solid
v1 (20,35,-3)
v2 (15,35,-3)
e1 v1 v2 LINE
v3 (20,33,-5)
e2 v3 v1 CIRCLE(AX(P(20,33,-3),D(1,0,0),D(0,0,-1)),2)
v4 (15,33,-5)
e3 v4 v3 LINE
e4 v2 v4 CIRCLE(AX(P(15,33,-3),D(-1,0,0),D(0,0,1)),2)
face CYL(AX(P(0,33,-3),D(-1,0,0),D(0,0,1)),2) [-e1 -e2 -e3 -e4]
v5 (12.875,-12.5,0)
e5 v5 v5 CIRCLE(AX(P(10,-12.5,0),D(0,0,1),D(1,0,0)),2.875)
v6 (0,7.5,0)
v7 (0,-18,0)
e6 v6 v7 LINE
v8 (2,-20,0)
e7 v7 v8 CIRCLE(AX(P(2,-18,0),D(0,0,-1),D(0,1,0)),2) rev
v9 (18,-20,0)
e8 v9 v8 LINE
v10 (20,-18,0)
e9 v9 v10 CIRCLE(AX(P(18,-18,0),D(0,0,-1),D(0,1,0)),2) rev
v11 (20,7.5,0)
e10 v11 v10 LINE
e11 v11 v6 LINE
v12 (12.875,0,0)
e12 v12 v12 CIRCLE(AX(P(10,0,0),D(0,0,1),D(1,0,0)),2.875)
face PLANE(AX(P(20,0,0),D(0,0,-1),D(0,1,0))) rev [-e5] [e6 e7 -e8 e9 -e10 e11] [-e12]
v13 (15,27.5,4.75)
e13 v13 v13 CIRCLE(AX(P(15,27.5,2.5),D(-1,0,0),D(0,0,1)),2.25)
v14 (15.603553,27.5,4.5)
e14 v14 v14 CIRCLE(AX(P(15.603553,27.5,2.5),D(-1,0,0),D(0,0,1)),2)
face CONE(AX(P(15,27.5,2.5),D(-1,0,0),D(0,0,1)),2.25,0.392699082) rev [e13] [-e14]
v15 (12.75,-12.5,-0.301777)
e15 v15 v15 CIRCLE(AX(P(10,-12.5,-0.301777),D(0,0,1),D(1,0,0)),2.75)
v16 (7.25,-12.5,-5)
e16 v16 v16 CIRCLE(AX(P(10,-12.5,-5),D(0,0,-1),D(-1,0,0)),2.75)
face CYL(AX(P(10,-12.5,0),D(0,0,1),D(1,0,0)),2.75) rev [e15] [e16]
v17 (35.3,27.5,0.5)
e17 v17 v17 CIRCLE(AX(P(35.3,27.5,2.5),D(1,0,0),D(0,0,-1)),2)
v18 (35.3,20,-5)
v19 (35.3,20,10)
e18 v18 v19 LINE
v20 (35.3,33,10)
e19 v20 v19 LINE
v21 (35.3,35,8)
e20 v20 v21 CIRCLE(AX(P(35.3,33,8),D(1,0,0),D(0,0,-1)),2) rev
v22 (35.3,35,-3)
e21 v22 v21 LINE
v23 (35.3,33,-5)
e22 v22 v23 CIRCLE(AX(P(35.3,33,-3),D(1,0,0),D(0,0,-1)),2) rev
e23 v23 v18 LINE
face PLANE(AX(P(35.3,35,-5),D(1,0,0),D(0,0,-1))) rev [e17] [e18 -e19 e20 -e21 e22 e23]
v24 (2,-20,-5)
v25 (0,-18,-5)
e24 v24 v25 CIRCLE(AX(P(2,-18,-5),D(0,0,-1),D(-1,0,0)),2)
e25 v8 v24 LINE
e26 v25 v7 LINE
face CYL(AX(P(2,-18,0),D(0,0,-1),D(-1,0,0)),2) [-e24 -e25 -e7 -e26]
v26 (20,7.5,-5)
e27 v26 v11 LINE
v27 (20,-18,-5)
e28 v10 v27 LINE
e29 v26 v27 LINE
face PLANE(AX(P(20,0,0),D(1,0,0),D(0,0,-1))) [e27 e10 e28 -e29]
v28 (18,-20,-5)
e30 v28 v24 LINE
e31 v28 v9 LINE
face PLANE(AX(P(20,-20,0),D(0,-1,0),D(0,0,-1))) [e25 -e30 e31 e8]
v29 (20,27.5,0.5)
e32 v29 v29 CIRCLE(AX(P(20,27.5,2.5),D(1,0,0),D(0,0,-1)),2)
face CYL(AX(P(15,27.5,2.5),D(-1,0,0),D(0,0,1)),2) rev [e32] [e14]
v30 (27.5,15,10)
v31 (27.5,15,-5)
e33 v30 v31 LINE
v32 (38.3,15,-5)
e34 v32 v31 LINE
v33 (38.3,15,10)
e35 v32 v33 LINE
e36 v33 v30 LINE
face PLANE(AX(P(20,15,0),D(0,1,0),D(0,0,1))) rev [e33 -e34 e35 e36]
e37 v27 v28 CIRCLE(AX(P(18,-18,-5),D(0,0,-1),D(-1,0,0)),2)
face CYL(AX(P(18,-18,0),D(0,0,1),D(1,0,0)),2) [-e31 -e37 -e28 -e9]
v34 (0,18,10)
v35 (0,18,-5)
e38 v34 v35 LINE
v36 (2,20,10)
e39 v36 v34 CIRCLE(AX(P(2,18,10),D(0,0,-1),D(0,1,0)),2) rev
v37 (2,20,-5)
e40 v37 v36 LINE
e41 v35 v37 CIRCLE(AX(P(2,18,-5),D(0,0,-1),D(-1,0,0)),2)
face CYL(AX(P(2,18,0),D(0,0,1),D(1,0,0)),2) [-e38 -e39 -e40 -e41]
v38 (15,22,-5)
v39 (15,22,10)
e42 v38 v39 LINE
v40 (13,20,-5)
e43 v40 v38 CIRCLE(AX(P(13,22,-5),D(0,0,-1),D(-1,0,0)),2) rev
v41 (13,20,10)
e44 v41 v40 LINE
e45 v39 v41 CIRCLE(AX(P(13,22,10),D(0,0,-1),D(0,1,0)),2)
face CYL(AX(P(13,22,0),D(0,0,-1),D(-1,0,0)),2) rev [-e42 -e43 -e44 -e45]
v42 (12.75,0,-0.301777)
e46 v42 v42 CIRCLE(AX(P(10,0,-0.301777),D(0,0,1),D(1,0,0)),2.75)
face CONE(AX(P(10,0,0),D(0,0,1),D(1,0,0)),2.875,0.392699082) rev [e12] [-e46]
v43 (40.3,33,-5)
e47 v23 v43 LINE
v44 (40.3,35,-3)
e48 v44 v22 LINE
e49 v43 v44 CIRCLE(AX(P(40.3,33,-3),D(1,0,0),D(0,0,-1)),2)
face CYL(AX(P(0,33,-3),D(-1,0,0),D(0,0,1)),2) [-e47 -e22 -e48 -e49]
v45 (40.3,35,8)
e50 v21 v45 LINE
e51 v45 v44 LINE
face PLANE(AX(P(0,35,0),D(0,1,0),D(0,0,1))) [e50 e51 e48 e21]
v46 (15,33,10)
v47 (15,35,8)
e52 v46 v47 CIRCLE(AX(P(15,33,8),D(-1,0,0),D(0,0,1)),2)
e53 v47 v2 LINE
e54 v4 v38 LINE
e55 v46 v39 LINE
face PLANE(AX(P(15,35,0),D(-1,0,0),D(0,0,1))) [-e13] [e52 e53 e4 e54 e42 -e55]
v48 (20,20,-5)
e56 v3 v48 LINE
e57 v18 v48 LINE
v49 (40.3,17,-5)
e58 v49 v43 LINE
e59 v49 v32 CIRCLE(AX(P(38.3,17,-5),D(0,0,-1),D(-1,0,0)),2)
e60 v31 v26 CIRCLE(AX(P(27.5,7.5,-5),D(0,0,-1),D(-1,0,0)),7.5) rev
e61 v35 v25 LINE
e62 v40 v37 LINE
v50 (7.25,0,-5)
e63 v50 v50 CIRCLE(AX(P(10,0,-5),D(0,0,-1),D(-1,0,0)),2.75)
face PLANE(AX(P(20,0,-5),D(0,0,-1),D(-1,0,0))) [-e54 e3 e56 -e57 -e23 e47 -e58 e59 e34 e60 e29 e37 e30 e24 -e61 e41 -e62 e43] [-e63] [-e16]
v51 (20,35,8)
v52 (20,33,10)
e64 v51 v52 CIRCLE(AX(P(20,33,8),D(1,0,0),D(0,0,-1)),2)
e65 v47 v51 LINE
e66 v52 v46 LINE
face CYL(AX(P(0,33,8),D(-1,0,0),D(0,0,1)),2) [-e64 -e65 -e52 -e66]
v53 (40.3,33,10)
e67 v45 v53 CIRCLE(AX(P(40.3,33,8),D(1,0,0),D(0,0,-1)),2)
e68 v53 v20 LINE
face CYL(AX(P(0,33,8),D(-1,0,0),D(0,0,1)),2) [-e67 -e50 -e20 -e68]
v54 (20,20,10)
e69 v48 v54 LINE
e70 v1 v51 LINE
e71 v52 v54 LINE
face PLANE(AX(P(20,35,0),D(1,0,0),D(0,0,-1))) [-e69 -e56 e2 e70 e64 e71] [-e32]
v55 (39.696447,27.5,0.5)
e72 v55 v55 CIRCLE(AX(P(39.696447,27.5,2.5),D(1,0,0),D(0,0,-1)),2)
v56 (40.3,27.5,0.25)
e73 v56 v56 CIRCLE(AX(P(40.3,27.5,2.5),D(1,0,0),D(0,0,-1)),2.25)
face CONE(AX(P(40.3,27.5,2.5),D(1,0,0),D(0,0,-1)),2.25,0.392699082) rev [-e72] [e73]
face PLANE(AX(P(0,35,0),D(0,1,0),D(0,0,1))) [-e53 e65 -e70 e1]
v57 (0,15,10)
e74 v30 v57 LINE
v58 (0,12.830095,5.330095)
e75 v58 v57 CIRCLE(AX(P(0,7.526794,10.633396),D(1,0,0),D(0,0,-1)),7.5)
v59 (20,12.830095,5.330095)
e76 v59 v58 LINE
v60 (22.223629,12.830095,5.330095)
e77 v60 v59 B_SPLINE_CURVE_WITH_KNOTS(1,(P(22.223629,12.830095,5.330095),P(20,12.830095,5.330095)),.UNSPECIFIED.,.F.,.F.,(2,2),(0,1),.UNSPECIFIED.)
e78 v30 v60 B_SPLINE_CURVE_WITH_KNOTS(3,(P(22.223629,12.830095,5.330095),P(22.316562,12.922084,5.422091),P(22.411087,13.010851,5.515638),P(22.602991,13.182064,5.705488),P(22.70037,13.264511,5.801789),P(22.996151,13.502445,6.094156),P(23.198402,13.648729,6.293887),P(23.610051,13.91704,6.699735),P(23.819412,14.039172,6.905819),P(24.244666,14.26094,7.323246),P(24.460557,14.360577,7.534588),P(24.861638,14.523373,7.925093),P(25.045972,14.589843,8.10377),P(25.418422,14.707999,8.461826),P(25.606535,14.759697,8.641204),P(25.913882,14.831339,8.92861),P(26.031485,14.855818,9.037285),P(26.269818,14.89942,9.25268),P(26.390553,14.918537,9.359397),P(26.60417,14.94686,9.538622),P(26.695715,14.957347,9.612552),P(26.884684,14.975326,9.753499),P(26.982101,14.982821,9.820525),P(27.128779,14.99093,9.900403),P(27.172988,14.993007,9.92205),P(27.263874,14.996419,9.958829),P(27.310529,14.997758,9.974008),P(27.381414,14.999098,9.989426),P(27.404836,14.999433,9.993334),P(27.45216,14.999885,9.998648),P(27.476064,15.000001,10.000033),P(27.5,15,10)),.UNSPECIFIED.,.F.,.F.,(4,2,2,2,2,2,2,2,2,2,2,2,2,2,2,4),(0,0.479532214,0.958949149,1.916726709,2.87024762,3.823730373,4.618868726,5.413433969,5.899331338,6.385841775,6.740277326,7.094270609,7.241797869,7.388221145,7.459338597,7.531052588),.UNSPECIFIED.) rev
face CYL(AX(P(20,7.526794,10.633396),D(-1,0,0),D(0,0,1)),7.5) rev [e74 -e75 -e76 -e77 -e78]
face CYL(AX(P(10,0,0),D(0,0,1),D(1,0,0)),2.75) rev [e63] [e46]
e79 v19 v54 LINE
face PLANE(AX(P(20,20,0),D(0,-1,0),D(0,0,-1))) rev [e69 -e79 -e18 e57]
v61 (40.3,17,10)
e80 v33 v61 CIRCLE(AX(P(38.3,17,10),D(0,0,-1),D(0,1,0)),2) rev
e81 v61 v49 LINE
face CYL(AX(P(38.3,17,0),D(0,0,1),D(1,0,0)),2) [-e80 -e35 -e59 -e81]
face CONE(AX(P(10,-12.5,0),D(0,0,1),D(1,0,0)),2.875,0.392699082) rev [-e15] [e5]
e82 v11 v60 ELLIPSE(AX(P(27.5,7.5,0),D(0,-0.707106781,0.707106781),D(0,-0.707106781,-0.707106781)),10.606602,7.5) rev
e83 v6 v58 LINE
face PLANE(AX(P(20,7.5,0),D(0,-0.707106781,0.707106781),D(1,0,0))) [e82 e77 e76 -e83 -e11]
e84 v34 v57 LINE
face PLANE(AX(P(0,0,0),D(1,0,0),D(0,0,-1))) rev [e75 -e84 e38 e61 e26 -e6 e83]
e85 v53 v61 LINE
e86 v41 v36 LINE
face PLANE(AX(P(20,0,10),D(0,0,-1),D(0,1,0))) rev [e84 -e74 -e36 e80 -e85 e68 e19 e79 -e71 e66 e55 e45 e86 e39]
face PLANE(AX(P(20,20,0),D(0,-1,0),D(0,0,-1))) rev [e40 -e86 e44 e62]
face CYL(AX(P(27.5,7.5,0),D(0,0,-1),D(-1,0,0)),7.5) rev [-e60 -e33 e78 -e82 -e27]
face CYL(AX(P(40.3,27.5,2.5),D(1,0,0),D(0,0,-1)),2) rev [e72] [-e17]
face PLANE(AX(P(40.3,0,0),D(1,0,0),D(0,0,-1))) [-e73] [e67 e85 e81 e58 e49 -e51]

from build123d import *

# Parameters (mm, degrees)
BOSS_EXTRUDE1_DEPTH                 = 20
BOSS_EXTRUDE2_DEPTH                 = 20.3
SKETCH4_W                           = 5
SKETCH4_H                           = 15
BOSS_EXTRUDE3_DEPTH                 = 15
CHAMFER2_SIZE                       = 7.5
FILLET1_R                           = 7.5
F_5_5_5_5_DIAMETER_HOLE1_AT_2_COUNT = 2
F_5_5_5_5_DIAMETER_HOLE1_AT_2_PITCH = 12.50000000000005
FILLET2_R                           = 2


with BuildPart() as part:
    # Sketch1 → Boss-Extrude1 (new body)
    with BuildSketch(Plane(origin=(0, 0, 0), x_dir=(0, 0, -1), z_dir=(1, 0, 0))):
        Polygon((-4.59e-15, 15), (-6.12e-15, 20), (-10.000000000000007, 20), (-10.000000000000004, 15), align=None)
        Polygon((4.999999999999994, -20), (6.12e-15, -20), (-6.12e-15, 20), (4.999999999999994, 20), align=None)
    extrude(amount=BOSS_EXTRUDE1_DEPTH)

    # Sketch3 → Boss-Extrude2 (add)
    with BuildSketch(Plane(origin=(20, 0, 0), x_dir=(0, 0, -1), z_dir=(1, 0, 0))):
        Polygon((-10.000000000000007, 20), (-10.000000000000004, 15), (4.999999999999994, 15), (4.999999999999994, 20), align=None)
    extrude(amount=BOSS_EXTRUDE2_DEPTH)

    # Sketch4 → Boss-Extrude3 (add)
    with BuildSketch(Plane(origin=(0, 20, 0), x_dir=(1, 0, 0), z_dir=(0, 1, 0))):
        Polygon((20.00000000000001, -10.000000000000007), (20.000000000000004, 4.999999999999994), (15.000000000000007, 4.999999999999994), (15.000000000000007, -10.000000000000007), align=None)
        with Locations((37.800000000000004, -2.5000000000000067)):
            Rectangle(SKETCH4_W, SKETCH4_H)
    extrude(amount=BOSS_EXTRUDE3_DEPTH)

    # Chamfer2
    chamfer2_edges = [part.edges().sort_by_distance(p)[0] for p in [
        (10, 15, 4.96e-15),
    ]]
    chamfer(chamfer2_edges, length=CHAMFER2_SIZE)

    # Fillet1
    # the kernel refuses this fillet: 7.5 mm, written as the material it adds along each edge
    with BuildSketch(Plane(origin=(0, 15, 7.500000000000005), x_dir=(0, -0.7071067811865472, -0.7071067811865479), z_dir=(1, 0, 0))) as fillet1_piece_1:
        with BuildLine():
            CenterArc((3.068709480812204, -7.500000000000002), FILLET1_R, 90, 40.15544377727605)
            Line((-1.7677669529663684, -1.7677669529663669), (0, 0))
            Line((0, 0), (3.0687094808122044, -1.2e-16))
        make_face()
    extrude(amount=20)
    with BuildSketch(Plane(origin=(20, 15, 26.250000000000007), x_dir=(0, -1, 0), z_dir=(0, 0, -1))) as fillet1_piece_2_section:
        with BuildLine():
            CenterArc((FILLET1_R, -FILLET1_R), FILLET1_R, 90, 90)
            Line((0, -FILLET1_R), (0, 0))
            Line((0, 0), (FILLET1_R, 0))
        make_face()
    fillet1_piece_2 = extrude(amount=31.25, mode=Mode.PRIVATE)
    fillet1_piece_2 = split(fillet1_piece_2, bisect_by=Plane(origin=(20, 24.375, 16.875000000000014), z_dir=(0, 0.7071067811865477, -0.7071067811865474)), keep=Keep.TOP, mode=Mode.PRIVATE)
    add(fillet1_piece_2)
    with BuildSketch(Plane(origin=(20, 15, 26.250000000000007), x_dir=(0, -1, 0), z_dir=(0, 0, -1))) as fillet1_piece_3a_section:
        with BuildLine():
            CenterArc((FILLET1_R, -FILLET1_R), FILLET1_R, 90, 90)
            Line((0, -FILLET1_R), (0, 0))
            Line((0, 0), (FILLET1_R, 0))
        make_face()
    fillet1_piece_3a = extrude(amount=31.25, mode=Mode.PRIVATE)
    fillet1_piece_3a = split(fillet1_piece_3a, bisect_by=Plane(origin=(20, 15.000000000000012, 10), z_dir=(0, 7.1e-16, -1)), keep=Keep.TOP, mode=Mode.PRIVATE)
    fillet1_piece_3a = split(fillet1_piece_3a, bisect_by=Plane(origin=(20, 24.375, 16.87500000000001), z_dir=(0, -0.7071067811865477, 0.7071067811865474)), keep=Keep.TOP, mode=Mode.PRIVATE)
    with BuildSketch(Plane(origin=(0, 15, 7.500000000000005), x_dir=(0, -0.7071067811865472, -0.7071067811865479), z_dir=(1, 0, 0))) as fillet1_piece_3b_section:
        with BuildLine():
            CenterArc((3.068709480812204, -7.500000000000002), FILLET1_R, 90, 40.15544377727605)
            Line((-1.7677669529663684, -1.7677669529663669), (0, 0))
            Line((0, 0), (3.0687094808122044, -1.2e-16))
        make_face()
    fillet1_piece_3b = extrude(amount=27.67177370203051, mode=Mode.PRIVATE)
    fillet1_piece_3b = split(fillet1_piece_3b, bisect_by=Plane(origin=(20, 15, 7.500000000000005), z_dir=(1, 0, 0)), keep=Keep.TOP, mode=Mode.PRIVATE)
    fillet1_piece_3 = fillet1_piece_3a & fillet1_piece_3b
    add(fillet1_piece_3)

    # Sketch7 → Ø4.0 (4) Diameter Hole1 (revolve, cut)
    with BuildSketch(Plane(origin=(15.000000000000007, 27.500000000000004, 2.5000000000000075), x_dir=(0, 0, 1), z_dir=(0, 1, 0))):
        Polygon((0, 0), (-1.22e-15, 5.000000000000001), (1.9999999999999967, 5.000000000000001), (1.9999999999999996, 0.6035533905932753), (2.2500000000000004, -1.73e-15), align=None)
    f_4_0_4_diameter_hole1 = revolve(axis=Axis((8.650000000000016, 27.500000000000004, 2.5000000000000075), (1, 0, 0)), mode=Mode.SUBTRACT)

    # Mirror1: Ø4.0 (4) Diameter Hole1 across plane
    add(f_4_0_4_diameter_hole1.mirror(Plane(origin=(27.65000000000001, 0, -6.4e-15), x_dir=(2.3e-16, 0, 1), z_dir=(1, 0, -2.3e-16))), mode=Mode.SUBTRACT)

    # Sketch9 → Ø5.5 (5.5) Diameter Hole1 (revolve, cut)
    with BuildSketch(Plane(origin=(10, 0, 0), x_dir=(0, -1, 0), z_dir=(1, 0, 0))):
        Polygon((0, 0), (-1.22e-15, 4.999999999999994), (2.749999999999999, 4.999999999999994), (2.7499999999999996, 0.30177669529663986), (2.875, 0), align=None)
    f_5_5_5_5_diameter_hole1 = revolve(axis=Axis((10, 0, 6.349999999999991), (0, 0, -1)), mode=Mode.SUBTRACT)

    # Ø5.5 (5.5) Diameter Hole1 at 2: Ø5.5 (5.5) Diameter Hole1 ×2
    with Locations(*[(0, -i * F_5_5_5_5_DIAMETER_HOLE1_AT_2_PITCH, 0) for i in range(1, F_5_5_5_5_DIAMETER_HOLE1_AT_2_COUNT)]):
        add(f_5_5_5_5_diameter_hole1, mode=Mode.SUBTRACT)

    # Fillet2
    fillet2_edges = [part.edges().sort_by_distance(p)[0] for p in [
        (0, -20, -2.5),
        (20, -20, -2.5),
        (40.3, 15, 2.5000000000000053),
        (17.500000000000007, 35, 10.000000000000007),
        (17.500000000000007, 35, -4.999999999999994),
        (15.000000000000007, 20, 2.500000000000007),
        (37.800000000000004, 35, -4.999999999999994),
        (37.800000000000004, 35, 10.000000000000007),
        (0, 20, 2.500000000000006),
    ]]
    fillet(fillet2_edges, radius=FILLET2_R)


solid = part.part
